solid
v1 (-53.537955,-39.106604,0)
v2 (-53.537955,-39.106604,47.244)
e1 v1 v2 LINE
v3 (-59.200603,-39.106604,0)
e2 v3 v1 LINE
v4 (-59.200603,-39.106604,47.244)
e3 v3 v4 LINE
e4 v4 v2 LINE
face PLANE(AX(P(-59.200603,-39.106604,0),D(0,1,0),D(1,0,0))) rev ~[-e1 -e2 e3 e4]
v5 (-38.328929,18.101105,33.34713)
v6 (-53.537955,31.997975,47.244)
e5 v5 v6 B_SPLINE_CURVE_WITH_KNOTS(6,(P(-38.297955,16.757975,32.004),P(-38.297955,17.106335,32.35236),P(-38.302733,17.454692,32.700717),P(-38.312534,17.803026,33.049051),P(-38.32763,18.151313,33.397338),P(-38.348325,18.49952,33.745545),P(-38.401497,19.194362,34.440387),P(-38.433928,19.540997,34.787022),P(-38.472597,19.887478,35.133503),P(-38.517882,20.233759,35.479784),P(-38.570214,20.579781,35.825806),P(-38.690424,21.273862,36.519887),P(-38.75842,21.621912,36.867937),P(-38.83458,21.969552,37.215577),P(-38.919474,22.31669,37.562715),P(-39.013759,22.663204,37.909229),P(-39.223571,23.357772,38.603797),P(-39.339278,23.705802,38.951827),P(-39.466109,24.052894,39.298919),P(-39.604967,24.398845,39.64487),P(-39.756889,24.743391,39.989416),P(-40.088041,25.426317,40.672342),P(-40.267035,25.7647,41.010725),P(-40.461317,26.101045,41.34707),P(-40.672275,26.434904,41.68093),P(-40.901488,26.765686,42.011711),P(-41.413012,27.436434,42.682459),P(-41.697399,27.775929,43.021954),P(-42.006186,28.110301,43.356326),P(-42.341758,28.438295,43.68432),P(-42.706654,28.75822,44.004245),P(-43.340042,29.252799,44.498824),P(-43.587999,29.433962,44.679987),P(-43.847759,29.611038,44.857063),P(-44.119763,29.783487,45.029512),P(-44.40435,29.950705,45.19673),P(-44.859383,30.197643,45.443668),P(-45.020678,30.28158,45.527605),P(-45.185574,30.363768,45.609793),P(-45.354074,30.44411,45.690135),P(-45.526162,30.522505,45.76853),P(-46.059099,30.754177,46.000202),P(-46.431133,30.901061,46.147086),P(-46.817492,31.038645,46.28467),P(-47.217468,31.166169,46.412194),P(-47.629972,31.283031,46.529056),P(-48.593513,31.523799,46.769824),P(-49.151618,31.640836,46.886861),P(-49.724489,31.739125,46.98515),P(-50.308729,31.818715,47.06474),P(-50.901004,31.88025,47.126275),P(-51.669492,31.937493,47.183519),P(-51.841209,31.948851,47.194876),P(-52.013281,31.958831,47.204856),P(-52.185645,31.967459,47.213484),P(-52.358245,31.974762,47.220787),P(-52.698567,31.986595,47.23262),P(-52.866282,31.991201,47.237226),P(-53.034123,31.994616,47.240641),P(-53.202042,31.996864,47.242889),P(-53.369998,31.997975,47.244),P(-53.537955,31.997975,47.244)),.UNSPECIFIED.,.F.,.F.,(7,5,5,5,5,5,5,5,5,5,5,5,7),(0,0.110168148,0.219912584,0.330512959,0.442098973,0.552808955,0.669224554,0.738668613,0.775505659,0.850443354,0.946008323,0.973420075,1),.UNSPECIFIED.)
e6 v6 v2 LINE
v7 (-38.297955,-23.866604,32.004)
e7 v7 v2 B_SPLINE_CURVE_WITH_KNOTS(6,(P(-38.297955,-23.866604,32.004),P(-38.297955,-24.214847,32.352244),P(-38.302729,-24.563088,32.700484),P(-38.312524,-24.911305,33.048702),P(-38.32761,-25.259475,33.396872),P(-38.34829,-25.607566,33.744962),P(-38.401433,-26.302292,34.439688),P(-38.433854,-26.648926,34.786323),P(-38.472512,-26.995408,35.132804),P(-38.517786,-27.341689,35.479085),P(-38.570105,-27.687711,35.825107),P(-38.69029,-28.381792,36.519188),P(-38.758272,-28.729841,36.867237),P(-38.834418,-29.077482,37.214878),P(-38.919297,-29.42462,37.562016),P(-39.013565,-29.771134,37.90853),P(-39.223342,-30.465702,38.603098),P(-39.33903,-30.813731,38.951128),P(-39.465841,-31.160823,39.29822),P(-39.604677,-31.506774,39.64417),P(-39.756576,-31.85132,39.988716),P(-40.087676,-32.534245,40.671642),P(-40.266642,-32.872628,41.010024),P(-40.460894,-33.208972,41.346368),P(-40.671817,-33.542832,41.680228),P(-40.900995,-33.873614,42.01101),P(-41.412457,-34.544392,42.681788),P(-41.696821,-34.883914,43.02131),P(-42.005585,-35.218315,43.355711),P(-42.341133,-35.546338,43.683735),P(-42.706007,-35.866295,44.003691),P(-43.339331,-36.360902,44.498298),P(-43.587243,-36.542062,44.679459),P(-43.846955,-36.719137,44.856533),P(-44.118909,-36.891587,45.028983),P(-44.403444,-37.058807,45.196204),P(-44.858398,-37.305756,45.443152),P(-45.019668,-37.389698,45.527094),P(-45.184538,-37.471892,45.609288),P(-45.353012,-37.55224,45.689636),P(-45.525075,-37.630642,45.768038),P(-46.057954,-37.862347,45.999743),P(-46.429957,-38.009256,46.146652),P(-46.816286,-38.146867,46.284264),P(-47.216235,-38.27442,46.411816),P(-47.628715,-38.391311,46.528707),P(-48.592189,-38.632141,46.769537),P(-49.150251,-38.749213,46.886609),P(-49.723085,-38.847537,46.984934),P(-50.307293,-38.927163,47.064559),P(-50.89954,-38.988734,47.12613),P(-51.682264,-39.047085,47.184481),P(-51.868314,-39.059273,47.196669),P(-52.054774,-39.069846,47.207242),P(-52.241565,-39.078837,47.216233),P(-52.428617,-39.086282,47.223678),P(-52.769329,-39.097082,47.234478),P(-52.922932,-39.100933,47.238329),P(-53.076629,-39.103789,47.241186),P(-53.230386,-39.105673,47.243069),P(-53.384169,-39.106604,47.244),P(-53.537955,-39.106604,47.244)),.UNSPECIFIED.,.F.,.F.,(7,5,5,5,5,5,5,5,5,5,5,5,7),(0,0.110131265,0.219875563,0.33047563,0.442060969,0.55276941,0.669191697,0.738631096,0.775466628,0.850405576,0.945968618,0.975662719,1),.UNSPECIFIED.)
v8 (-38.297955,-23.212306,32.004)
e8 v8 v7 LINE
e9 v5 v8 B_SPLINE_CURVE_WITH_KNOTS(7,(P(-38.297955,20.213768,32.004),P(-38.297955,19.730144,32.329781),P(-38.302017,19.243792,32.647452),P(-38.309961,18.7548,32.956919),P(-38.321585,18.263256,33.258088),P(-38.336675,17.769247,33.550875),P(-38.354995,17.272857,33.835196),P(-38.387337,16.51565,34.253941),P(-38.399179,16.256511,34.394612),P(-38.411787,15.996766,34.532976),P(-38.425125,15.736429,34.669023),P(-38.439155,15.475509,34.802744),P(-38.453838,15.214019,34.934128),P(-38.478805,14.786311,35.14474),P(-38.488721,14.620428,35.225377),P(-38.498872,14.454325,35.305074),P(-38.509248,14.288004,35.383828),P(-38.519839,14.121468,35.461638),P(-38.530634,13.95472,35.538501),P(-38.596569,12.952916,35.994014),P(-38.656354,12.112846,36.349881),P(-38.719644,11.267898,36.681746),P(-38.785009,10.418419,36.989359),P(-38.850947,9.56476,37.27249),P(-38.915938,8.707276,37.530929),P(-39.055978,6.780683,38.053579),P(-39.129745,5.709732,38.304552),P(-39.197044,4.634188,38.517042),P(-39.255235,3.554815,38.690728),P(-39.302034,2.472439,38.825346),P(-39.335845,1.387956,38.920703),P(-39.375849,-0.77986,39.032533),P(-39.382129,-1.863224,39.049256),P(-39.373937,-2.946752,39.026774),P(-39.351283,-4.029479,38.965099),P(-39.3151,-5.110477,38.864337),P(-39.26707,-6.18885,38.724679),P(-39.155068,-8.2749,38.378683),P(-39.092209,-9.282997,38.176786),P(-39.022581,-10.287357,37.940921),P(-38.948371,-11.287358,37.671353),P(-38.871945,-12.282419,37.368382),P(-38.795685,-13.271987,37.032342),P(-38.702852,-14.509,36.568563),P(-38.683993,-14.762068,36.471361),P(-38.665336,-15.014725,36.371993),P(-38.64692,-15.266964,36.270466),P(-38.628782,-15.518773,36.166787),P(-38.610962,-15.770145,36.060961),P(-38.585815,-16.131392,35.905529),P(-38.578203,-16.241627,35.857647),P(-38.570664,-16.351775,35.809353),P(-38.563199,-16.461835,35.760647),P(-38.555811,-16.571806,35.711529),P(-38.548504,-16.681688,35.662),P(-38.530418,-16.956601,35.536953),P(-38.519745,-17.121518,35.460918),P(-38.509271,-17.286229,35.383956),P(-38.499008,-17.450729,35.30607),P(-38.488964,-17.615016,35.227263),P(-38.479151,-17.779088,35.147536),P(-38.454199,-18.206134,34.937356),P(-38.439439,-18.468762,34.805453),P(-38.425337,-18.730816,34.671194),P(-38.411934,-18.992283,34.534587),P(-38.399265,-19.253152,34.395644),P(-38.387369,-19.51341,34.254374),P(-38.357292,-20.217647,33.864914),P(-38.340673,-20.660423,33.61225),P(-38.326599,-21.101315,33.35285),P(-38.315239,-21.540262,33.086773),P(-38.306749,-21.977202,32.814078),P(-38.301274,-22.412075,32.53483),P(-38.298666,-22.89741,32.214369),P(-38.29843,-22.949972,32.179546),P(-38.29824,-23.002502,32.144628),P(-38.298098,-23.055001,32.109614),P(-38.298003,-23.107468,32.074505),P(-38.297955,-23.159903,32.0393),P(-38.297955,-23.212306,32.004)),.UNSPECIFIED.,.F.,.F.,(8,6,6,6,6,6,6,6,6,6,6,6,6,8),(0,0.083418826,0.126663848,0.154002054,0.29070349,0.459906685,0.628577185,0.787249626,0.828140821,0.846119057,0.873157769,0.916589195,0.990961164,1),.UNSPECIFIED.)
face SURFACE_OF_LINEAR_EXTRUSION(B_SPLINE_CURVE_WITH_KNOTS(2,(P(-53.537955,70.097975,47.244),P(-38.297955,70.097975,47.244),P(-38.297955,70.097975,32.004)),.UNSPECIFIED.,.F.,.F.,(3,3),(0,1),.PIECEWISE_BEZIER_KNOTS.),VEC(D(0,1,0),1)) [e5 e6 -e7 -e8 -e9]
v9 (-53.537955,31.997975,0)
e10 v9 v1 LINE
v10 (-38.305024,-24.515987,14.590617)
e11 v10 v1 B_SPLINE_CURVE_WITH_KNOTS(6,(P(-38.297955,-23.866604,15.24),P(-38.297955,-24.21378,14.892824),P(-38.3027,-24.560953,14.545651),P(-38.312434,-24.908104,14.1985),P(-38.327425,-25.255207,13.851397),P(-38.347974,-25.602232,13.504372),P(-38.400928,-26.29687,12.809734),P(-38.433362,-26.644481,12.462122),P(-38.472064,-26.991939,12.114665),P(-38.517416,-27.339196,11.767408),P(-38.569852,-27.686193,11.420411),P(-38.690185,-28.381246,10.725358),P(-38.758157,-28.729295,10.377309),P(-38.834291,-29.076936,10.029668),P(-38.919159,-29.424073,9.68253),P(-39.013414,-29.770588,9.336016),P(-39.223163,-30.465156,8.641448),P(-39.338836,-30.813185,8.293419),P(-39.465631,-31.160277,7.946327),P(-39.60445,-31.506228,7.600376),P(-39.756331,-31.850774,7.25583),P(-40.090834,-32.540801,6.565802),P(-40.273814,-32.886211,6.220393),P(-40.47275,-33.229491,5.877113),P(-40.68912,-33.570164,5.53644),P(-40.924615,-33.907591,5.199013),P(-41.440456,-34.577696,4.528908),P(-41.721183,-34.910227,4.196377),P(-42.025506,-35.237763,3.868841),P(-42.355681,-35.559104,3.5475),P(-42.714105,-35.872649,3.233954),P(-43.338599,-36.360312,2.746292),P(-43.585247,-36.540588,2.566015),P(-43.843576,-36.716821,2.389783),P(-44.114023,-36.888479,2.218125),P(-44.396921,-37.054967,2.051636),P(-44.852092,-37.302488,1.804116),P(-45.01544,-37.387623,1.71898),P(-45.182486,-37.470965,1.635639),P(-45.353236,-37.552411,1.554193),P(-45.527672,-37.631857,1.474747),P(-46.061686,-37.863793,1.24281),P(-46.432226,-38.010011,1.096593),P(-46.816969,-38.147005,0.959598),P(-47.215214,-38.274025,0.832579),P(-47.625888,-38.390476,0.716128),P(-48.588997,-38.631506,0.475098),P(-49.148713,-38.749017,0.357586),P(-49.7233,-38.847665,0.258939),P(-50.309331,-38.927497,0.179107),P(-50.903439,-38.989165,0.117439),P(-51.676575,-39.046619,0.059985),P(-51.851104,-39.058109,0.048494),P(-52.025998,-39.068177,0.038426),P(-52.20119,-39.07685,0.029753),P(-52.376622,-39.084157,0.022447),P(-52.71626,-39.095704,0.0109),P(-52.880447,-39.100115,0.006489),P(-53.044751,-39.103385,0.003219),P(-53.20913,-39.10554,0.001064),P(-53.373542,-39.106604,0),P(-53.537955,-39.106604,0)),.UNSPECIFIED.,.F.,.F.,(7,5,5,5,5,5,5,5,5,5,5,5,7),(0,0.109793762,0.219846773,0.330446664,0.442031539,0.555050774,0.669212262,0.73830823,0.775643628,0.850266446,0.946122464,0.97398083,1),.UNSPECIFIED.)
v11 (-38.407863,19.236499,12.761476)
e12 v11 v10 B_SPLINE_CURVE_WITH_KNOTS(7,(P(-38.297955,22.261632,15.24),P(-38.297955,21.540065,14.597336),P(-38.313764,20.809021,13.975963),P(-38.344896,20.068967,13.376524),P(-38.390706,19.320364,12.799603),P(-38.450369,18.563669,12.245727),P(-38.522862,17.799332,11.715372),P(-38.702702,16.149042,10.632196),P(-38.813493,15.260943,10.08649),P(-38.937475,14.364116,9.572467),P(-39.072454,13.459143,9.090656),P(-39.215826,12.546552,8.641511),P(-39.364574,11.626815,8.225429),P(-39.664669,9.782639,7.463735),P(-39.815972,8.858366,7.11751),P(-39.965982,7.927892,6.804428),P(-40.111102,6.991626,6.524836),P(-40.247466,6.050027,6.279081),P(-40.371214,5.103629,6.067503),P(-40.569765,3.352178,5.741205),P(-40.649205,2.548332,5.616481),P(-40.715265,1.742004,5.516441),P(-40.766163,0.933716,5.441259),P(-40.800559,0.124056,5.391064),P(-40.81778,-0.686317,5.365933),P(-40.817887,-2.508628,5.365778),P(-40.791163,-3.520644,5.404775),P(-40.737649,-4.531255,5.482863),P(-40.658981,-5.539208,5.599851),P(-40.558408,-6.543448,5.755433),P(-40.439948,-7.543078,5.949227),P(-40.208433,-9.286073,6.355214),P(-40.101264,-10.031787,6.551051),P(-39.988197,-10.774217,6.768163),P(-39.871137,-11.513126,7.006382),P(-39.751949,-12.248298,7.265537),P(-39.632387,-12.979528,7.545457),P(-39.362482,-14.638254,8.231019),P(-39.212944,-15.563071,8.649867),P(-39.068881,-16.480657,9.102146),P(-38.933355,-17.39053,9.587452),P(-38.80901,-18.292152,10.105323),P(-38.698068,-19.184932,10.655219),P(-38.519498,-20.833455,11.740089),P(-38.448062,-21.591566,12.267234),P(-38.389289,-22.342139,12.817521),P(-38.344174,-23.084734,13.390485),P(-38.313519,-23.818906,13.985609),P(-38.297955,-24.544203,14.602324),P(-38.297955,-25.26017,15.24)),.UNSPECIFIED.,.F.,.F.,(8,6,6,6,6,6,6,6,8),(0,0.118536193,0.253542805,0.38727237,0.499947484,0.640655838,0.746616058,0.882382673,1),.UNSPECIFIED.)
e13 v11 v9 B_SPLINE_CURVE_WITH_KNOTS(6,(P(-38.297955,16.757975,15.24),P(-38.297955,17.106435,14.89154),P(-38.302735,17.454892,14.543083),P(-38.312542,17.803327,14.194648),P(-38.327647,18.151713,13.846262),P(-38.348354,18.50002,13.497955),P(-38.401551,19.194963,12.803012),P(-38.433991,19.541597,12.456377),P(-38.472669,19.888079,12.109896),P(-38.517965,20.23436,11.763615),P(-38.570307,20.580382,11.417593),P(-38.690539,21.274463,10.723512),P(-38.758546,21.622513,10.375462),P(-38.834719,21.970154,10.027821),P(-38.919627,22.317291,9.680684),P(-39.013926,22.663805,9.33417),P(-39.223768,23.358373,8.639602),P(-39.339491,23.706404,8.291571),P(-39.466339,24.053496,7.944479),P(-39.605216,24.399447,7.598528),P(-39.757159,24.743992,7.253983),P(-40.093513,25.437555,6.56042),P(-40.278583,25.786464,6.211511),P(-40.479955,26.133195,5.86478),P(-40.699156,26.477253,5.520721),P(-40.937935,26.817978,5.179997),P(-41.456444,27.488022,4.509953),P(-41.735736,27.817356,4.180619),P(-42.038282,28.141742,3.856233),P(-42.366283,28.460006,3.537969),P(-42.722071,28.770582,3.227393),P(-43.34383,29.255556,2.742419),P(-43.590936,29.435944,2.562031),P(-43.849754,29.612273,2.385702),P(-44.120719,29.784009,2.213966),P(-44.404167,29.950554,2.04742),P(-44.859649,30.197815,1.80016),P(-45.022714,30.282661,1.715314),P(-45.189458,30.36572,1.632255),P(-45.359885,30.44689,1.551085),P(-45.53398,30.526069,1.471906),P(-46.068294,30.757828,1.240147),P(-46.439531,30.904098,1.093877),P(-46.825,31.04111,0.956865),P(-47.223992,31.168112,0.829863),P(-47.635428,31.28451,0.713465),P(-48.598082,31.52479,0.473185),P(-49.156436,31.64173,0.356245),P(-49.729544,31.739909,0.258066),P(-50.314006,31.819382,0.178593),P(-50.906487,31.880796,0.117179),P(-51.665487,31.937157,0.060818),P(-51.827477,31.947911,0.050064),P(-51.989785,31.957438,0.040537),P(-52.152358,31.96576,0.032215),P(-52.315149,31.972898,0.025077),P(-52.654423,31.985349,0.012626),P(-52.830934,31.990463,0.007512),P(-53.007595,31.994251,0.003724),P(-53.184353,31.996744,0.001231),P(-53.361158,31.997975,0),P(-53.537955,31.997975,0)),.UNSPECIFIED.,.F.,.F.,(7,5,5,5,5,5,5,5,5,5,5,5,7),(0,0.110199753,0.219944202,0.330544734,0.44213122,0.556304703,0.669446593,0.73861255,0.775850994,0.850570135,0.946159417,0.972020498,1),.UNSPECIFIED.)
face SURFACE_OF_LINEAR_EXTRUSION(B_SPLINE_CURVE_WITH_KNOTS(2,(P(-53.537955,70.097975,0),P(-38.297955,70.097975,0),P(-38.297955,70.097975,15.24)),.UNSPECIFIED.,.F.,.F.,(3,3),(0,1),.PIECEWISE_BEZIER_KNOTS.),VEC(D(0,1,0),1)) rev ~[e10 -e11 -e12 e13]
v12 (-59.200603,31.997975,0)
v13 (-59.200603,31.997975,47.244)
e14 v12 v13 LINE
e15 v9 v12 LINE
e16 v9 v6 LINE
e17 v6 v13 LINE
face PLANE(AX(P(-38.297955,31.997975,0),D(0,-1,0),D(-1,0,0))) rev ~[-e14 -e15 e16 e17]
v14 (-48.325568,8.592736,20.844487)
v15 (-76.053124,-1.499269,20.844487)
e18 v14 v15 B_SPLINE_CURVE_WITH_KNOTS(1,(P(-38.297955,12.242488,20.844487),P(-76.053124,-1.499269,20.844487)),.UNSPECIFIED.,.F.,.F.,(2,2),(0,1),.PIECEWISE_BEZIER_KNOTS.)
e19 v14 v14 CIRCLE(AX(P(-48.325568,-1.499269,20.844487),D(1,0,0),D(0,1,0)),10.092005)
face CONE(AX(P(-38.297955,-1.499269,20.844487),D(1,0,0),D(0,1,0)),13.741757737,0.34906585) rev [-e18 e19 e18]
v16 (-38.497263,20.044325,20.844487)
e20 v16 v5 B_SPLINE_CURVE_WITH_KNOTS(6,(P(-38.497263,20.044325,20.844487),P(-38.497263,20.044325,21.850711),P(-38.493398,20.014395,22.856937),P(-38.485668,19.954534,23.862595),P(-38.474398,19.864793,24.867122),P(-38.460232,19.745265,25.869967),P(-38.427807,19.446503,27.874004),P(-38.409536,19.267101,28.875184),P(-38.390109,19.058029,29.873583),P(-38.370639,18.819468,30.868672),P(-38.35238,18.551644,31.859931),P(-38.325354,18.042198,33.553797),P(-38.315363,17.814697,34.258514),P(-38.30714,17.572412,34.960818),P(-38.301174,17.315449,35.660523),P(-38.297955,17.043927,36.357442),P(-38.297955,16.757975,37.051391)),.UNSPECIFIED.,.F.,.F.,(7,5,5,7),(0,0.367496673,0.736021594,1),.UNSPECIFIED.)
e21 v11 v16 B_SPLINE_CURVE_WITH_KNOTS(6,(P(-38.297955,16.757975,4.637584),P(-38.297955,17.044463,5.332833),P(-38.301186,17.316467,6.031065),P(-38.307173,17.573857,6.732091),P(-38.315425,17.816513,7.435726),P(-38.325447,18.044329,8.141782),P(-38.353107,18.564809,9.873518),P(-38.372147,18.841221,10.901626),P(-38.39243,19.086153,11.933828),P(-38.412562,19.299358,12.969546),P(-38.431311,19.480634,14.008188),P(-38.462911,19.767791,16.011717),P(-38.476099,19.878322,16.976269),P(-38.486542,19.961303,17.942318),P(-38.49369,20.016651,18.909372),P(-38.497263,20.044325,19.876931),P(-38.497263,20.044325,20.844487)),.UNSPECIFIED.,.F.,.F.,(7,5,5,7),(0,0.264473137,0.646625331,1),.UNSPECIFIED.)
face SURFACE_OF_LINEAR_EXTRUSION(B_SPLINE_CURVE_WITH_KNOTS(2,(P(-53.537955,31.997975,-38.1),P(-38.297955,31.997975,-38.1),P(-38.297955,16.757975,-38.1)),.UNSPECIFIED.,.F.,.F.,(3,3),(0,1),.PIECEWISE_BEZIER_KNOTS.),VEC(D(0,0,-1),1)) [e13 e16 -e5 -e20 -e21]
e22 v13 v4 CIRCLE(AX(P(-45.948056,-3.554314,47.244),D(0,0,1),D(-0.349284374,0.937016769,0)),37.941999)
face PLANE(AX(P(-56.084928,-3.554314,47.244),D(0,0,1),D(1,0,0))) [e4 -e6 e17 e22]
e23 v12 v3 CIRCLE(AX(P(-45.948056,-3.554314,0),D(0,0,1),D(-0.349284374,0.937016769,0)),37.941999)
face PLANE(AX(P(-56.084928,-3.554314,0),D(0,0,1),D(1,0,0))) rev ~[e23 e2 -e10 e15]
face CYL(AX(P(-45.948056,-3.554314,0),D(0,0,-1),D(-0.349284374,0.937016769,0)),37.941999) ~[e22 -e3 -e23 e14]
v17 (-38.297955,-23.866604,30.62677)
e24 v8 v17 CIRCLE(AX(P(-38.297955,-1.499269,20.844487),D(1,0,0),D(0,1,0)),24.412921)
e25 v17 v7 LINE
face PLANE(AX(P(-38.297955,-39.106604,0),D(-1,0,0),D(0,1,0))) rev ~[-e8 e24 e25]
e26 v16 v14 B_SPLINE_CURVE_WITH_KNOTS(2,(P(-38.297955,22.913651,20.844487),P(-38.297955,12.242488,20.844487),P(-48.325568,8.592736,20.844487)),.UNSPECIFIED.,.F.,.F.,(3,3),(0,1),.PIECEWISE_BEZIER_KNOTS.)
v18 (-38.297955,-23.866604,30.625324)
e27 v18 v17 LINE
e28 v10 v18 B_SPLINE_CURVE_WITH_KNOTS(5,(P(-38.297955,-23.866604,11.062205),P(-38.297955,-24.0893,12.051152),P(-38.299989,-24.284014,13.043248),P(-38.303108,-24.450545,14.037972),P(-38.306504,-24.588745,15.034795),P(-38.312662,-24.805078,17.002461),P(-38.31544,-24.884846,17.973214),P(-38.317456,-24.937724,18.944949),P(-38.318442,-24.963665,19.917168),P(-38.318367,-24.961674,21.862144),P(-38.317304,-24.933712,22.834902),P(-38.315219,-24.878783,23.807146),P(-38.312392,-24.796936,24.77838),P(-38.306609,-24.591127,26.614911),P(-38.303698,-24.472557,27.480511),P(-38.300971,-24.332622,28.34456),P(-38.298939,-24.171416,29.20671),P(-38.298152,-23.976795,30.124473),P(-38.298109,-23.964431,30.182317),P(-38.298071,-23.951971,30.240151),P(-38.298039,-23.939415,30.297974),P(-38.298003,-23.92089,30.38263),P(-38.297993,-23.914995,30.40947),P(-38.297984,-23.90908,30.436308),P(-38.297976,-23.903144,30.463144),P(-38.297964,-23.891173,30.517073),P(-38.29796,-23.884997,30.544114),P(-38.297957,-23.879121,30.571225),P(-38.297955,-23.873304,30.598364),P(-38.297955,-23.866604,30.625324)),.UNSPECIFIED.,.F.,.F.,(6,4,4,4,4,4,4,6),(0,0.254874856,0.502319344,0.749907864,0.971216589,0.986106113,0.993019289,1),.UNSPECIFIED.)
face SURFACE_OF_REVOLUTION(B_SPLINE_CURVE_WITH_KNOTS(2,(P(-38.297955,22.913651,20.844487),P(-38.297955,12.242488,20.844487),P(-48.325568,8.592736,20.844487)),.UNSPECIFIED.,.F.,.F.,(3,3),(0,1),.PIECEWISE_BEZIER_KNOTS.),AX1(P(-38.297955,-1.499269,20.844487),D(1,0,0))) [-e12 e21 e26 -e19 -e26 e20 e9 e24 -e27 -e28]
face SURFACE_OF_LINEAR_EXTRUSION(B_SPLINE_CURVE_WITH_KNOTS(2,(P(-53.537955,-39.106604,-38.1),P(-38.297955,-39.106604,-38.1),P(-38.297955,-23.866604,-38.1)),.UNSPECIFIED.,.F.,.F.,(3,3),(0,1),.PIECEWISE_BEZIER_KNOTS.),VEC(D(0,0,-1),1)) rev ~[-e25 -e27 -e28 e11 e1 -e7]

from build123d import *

# Parameters (mm, degrees)
F1_DEPTH    = 47.244
F2_R        = 13.7417577373
F4_T1_DEPTH = 123.444
F4_T3_DEPTH = 147.3045786738


# Not quite as in the source:
# - a fillet or chamfer that OpenCascade refuses, or shapes differently, is made with other operations: its cross-section is extruded or revolved along the edge and cut away or added
# - an extrude whose draft closes it to a point is written as a loft to that point


with BuildPart() as f1:
    # F0 (on Top) → F1 (new body)
    with BuildSketch(Plane.XY):
        with BuildLine():
            Line((-38.2979549468, 31.997974962), (-59.2006028914, 31.997974962))
            ThreePointArc((-59.2006028914, 31.997974962), (-83.8900545196, -3.5543143749), (-59.2006028914, -39.1066037118))
            Line((-59.2006028914, -39.1066037118), (-38.2979549468, -39.1066037118))
            Line((-38.2979549468, -39.1066037118), (-38.2979549468, 31.997974962))
        make_face()
    extrude(amount=F1_DEPTH)

    # F2 (on face) → F3 section 0
    with BuildSketch(Plane.YZ.offset(-38.2979549468), mode=Mode.PRIVATE) as f3_s0:
        with Locations((-1.4992692741, 20.8444874734)):
            Circle(F2_R)
    loft([f3_s0.sketch, Vertex(-76.0531240335, -1.4992692741, 20.8444874734)], ruled=True, mode=Mode.SUBTRACT)

    # F4: fillet of radius 15.24 on 5 edges, made by hand

    # F4_s2 → F4_t1 (cut)
    with BuildSketch(Plane.XY.offset(-38.1)):
        with BuildLine():
            add(Edge.make_bspline(
                [(-53.5379549468, -39.1066037118), (-38.2979549468, -39.1066037118), (-38.2979549468, -23.8666037118)],
                knots=[0, 0, 0, 1, 1, 1], degree=2, weights=[1, 1, 1]))
            Line((-38.2979549468, -23.8666037118), (-38.2979549468, -39.1066037118))
            Line((-38.2979549468, -39.1066037118), (-53.5379549468, -39.1066037118))
        make_face()
        with BuildLine():
            add(Edge.make_bspline(
                [(-53.5379549468, 31.997974962), (-38.2979549468, 31.997974962), (-38.2979549468, 16.757974962)],
                knots=[0, 0, 0, 1, 1, 1], degree=2, weights=[1, 1, 1]))
            Line((-38.2979549468, 16.757974962), (-38.2979549468, 31.997974962))
            Line((-38.2979549468, 31.997974962), (-53.5379549468, 31.997974962))
        make_face()
    extrude(amount=F4_T1_DEPTH, mode=Mode.SUBTRACT)

    # F4_s4 → F4_t3 (cut)
    with BuildSketch(Plane.XZ.offset(-70.097974962)):
        with BuildLine():
            add(Edge.make_bspline(
                [(-53.5379549468, 0), (-38.2979549468, 0), (-38.2979549468, 15.24)],
                knots=[0, 0, 0, 1, 1, 1], degree=2, weights=[1, 1, 1]))
            Line((-38.2979549468, 15.24), (-38.2979549468, 0))
            Line((-38.2979549468, 0), (-53.5379549468, 0))
        make_face()
        with BuildLine():
            add(Edge.make_bspline(
                [(-53.5379549468, 47.244), (-38.2979549468, 47.244), (-38.2979549468, 32.004)],
                knots=[0, 0, 0, 1, 1, 1], degree=2, weights=[1, 1, 1]))
            Line((-38.2979549468, 32.004), (-38.2979549468, 47.244))
            Line((-38.2979549468, 47.244), (-53.5379549468, 47.244))
        make_face()
    extrude(amount=F4_T3_DEPTH, mode=Mode.SUBTRACT)

    # F4_s5 → F4_t6 (revolve, cut)
    with BuildSketch(Plane.XY.offset(20.8444874734)):
        with BuildLine():
            add(Edge.make_bspline(
                [(-38.2979549468, 22.9136513455), (-38.2979549468, 12.2424884632), (-48.3255679625, 8.5927358047)],
                knots=[0, 0, 0, 1, 1, 1], degree=2, weights=[1, 1, 1]))
            Line((-48.3255679625, 8.5927358047), (-38.2979549468, 12.2424884632))
            Line((-38.2979549468, 12.2424884632), (-38.2979549468, 22.9136513455))
        make_face()
    revolve(axis=Axis((-38.2979549468, -1.4992692741, 20.8444874734), (1, 0, 0)), mode=Mode.SUBTRACT)


solid = f1.part
